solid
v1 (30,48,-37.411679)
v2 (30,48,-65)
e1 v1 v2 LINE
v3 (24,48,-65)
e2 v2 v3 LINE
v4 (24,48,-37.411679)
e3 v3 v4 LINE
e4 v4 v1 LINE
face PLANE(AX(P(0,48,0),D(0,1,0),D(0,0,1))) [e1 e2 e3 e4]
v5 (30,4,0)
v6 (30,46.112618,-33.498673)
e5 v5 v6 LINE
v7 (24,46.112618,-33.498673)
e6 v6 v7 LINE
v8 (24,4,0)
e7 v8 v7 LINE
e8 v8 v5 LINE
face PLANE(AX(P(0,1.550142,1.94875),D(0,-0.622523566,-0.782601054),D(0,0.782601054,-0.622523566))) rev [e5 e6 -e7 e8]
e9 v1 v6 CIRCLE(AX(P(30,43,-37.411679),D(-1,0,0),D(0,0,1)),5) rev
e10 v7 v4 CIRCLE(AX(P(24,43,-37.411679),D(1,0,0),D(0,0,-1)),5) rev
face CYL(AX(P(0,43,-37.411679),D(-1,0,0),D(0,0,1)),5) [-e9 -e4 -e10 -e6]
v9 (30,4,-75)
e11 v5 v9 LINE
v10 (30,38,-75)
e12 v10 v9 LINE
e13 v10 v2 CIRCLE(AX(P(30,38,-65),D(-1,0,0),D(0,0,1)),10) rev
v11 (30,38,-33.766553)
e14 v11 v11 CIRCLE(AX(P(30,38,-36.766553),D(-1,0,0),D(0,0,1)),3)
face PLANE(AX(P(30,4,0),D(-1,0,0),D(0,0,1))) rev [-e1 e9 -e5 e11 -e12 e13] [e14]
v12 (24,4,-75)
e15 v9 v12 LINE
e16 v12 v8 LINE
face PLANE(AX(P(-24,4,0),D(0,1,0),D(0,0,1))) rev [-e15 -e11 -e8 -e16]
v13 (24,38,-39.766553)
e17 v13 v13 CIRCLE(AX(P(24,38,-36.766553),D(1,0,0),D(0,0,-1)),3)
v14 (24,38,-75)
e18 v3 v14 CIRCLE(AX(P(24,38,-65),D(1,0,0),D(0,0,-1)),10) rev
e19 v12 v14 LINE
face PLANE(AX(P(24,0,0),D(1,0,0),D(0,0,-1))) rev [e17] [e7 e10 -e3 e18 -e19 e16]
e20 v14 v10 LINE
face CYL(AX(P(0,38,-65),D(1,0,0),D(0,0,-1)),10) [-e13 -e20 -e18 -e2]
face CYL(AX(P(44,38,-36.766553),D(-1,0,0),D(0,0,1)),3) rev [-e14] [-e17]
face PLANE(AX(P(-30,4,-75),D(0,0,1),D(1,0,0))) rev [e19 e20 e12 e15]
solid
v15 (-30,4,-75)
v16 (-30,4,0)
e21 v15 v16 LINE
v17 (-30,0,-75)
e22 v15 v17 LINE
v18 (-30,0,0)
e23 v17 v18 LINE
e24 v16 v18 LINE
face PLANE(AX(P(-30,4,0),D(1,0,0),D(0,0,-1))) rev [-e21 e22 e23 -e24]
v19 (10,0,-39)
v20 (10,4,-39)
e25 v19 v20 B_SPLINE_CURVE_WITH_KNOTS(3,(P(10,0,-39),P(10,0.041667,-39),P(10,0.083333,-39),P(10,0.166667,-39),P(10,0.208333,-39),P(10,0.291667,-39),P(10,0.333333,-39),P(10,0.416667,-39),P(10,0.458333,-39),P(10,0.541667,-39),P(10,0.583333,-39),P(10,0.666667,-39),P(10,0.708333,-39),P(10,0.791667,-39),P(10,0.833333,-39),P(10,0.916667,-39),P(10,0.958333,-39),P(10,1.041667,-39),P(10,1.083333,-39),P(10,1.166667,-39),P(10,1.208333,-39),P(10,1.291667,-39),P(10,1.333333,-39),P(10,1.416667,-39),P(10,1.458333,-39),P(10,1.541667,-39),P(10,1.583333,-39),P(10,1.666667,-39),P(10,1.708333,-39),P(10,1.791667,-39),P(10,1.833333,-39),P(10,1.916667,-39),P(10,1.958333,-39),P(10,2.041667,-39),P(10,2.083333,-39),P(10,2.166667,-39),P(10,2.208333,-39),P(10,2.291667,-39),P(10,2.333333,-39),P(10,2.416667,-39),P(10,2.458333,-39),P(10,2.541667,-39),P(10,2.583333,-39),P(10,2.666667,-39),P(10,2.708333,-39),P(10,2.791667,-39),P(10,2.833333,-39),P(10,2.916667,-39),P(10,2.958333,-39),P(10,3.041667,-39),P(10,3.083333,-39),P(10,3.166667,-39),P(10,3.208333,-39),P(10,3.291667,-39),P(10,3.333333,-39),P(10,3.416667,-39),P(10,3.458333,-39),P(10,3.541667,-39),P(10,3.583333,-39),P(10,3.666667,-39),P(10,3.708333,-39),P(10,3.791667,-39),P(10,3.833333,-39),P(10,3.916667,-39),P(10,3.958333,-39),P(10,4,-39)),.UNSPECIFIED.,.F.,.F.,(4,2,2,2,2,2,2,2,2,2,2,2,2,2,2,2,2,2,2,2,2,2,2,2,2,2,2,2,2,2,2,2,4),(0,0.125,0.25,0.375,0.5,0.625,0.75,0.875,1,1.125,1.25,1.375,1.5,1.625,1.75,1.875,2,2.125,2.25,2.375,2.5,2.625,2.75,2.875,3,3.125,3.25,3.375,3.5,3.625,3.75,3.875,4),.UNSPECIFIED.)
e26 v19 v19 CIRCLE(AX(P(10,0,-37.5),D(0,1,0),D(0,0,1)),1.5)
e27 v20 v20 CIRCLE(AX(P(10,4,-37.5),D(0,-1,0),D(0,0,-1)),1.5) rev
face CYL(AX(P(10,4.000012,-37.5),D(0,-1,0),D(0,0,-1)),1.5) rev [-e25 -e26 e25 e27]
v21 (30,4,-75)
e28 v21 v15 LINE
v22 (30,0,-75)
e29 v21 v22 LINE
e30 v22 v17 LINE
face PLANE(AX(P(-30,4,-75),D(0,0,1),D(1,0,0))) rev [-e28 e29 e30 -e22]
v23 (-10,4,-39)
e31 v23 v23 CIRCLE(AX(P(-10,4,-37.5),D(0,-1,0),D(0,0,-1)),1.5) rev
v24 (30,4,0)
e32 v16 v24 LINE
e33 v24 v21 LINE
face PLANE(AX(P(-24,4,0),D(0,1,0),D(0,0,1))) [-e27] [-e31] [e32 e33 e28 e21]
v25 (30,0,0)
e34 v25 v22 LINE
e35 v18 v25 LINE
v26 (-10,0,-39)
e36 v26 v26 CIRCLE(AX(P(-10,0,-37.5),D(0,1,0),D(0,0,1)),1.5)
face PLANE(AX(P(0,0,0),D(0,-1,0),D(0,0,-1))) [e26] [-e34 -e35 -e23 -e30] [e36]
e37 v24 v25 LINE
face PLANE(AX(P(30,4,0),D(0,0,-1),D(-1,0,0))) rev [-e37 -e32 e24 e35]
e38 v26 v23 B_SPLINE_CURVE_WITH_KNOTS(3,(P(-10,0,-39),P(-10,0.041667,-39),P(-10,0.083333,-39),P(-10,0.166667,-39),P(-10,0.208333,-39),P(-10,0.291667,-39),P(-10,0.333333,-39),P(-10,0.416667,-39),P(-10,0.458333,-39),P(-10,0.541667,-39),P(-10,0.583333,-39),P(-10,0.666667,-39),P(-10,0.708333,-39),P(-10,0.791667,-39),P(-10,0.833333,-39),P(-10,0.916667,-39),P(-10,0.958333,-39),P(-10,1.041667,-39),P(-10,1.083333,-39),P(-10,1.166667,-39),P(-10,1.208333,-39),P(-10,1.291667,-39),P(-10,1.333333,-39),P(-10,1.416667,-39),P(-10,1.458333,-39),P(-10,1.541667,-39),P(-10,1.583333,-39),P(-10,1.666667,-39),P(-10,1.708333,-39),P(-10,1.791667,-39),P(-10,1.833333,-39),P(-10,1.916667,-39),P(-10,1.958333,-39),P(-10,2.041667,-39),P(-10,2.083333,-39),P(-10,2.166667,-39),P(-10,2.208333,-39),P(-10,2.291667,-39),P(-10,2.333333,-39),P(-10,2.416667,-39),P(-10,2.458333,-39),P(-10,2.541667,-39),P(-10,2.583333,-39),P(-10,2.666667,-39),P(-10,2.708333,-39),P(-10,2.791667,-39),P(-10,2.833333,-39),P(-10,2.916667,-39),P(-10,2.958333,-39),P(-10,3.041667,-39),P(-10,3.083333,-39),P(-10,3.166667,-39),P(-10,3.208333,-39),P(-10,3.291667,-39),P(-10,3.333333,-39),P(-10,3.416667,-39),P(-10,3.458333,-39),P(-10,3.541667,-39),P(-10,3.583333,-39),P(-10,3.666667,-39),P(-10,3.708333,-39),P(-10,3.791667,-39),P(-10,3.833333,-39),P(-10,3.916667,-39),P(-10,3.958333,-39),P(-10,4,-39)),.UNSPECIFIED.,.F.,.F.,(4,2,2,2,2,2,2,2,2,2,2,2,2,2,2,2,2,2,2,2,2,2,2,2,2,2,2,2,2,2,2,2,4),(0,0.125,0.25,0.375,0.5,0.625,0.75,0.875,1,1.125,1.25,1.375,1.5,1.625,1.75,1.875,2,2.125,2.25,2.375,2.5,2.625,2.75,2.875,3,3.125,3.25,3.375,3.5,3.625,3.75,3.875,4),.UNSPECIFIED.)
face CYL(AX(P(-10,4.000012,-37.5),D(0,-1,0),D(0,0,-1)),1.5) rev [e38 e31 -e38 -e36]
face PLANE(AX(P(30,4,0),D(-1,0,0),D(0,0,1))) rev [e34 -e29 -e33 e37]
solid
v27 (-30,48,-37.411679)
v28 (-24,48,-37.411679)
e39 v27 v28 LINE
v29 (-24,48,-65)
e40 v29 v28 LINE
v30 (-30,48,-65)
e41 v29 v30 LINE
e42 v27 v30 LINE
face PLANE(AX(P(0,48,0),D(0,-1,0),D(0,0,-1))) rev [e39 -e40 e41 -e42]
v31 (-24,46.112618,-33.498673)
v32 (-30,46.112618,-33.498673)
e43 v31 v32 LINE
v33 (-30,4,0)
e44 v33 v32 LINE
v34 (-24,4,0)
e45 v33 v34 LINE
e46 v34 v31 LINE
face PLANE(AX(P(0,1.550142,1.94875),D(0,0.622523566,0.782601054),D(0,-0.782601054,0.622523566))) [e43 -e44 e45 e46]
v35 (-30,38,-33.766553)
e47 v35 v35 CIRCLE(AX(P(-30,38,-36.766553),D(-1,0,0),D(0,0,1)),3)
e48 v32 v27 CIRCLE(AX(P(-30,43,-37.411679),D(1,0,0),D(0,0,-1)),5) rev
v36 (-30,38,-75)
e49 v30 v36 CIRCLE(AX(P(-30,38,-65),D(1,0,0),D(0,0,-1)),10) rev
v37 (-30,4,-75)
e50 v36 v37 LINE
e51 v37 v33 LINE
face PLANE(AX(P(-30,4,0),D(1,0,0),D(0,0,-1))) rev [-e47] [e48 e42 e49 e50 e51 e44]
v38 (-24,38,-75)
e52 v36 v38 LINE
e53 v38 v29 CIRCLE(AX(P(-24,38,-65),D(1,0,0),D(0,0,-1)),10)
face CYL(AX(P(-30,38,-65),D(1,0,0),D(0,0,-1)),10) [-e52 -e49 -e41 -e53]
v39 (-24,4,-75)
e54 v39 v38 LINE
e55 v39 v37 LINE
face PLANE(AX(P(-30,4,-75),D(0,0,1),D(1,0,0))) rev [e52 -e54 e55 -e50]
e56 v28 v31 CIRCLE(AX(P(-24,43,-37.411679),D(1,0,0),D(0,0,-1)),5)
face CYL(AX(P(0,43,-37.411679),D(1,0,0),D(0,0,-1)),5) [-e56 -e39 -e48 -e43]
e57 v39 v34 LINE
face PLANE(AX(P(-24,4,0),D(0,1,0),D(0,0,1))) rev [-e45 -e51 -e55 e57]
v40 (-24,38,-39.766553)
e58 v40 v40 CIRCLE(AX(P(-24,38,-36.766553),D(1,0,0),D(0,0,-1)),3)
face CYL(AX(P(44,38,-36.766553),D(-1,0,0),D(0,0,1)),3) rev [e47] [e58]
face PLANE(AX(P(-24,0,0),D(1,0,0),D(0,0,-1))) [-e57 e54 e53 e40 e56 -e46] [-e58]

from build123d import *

# Parameters (mm, degrees)
SKETCH1_W               = 60
SKETCH1_H               = 75
BOSS_EXTRUDE1_DEPTH     = 4
CUT_EXTRUDE1_DEPTH      = 81.876448982
CUT_EXTRUDE1_DEPTH_BACK = 4
SKETCH2_R               = 1.5
SKETCH8_R               = 3
CUT_EXTRUDE2_DEPTH      = 74
FILLET3_R               = 5
FILLET4_R               = 10
SPLIT1_START            = 4
SPLIT1_OUTLINE_W        = 6
SPLIT1_OUTLINE_H        = 76
SPLIT1_DEPTH            = 44
SPLIT1_START_2          = -30
SPLIT1_2_OUTLINE_R      = 3
SPLIT1_2_DEPTH          = 6
SPLIT1_START_3          = 24
SPLIT1_3_OUTLINE_R      = 3
SPLIT1_3_DEPTH          = 6


# Read off the part's stored shape, not the designer's step: Split1
with BuildPart() as part:
    # Sketch1 → Boss-Extrude1 (new body)
    with BuildSketch(Plane(origin=(0, 0, 0), x_dir=(1, 0, 0), z_dir=(0, 1, 0))):
        with Locations((0, 37.5)):
            Rectangle(SKETCH1_W, SKETCH1_H)
    extrude(amount=BOSS_EXTRUDE1_DEPTH)

    # Sketch2 → Cut-Extrude1 (cut, two sides: drawn at the far end of the back side and taken through both)
    with BuildSketch(Plane(origin=(0, 4, 0), x_dir=(1, 0, 0), z_dir=(0, 1, 0)).offset(-CUT_EXTRUDE1_DEPTH_BACK)):
        with Locations(Location((-10, 37.5, 0), (0, 0, 90))):
            Circle(SKETCH2_R)
        with Locations(Location((10, 37.5, 0), (0, 0, 90))):
            Circle(SKETCH2_R)
    extrude(amount=CUT_EXTRUDE1_DEPTH + CUT_EXTRUDE1_DEPTH_BACK, mode=Mode.SUBTRACT)

    # Sketch3 → Loft1 section 0
    with BuildSketch(Plane(origin=(0, 4, 0), x_dir=(1, 0, 0), z_dir=(0, 1, 0))):
        with BuildLine():
            Line((30, 75), (24, 75))
            Line((24, 75), (24, 0))
            Line((24, 0), (30, 0))
            Line((30, 0), (30, 75))
        make_face()
    # Sketch4 → Loft1 section 1
    with BuildSketch(Plane(origin=(0, 48, 0), x_dir=(1, 0, 0), z_dir=(0, 1, 0))):
        with BuildLine():
            Line((24, 75), (24, 35))
            Line((24, 35), (30, 35))
            Line((30, 35), (30, 75))
            Line((30, 75), (24, 75))
        make_face()
    loft()

    # Sketch3<19> → Loft2 section 0
    with BuildSketch(Plane(origin=(0, 4, 0), x_dir=(1, 0, 0), z_dir=(0, 1, 0))):
        with BuildLine():
            Line((-30, 75), (-24, 75))
            Line((-24, 75), (-24, 0))
            Line((-24, 0), (-30, 0))
            Line((-30, 0), (-30, 75))
        make_face()
    # Sketch4<17> → Loft2 section 1
    with BuildSketch(Plane(origin=(0, 48, 0), x_dir=(1, 0, 0), z_dir=(0, 1, 0))):
        with BuildLine():
            Line((-24, 75), (-24, 35))
            Line((-24, 35), (-30, 35))
            Line((-30, 35), (-30, 75))
            Line((-30, 75), (-24, 75))
        make_face()
    loft()

    # Sketch8 → Cut-Extrude2 (cut)
    with BuildSketch(Plane.ZY.offset(30)):
        with Locations((-36.766552642, 38)):
            Circle(SKETCH8_R)
    extrude(amount=-CUT_EXTRUDE2_DEPTH, mode=Mode.SUBTRACT)

    # Fillet3
    fillet3_edges = [part.edges().sort_by_distance(p)[0] for p in [
        (27, 48, -35),
        (-27, 48, -35),
    ]]
    fillet(fillet3_edges, radius=FILLET3_R)

    # Fillet4
    fillet4_edges = [part.edges().sort_by_distance(p)[0] for p in [
        (-27, 48, -75),
        (27, 48, -75),
    ]]
    fillet(fillet4_edges, radius=FILLET4_R)

    # Split1 outline → Split1 (cut)
    with BuildSketch(Plane(origin=(0, 0, 0), x_dir=(1, 0, 0), z_dir=(0, 1, 0)).offset(SPLIT1_START)):
        with Locations((-27, 37)):
            Rectangle(SPLIT1_OUTLINE_W, SPLIT1_OUTLINE_H)
        with Locations((27, 37)):
            Rectangle(SPLIT1_OUTLINE_W, SPLIT1_OUTLINE_H)
    extrude(amount=SPLIT1_DEPTH, mode=Mode.SUBTRACT)


with BuildPart() as body_2:
    # Split1 2 outline → Split1 2 (new body)
    with BuildSketch(Plane.YZ.offset(SPLIT1_START_2)):
        with BuildLine():
            Line((4, 0), (4, -75))
            Line((4, -75), (38, -75))
            ThreePointArc((38, -75), (45.071067812, -72.071067812), (48, -65))
            Line((48, -65), (48, -37.411678544))
            ThreePointArc((48, -37.411678544), (47.503503589, -35.239477948), (46.112617829, -33.498673273))
            Line((46.112617829, -33.498673273), (4, 0))
        make_face()
        with Locations((38, -36.766552642)):
            Circle(SPLIT1_2_OUTLINE_R, mode=Mode.SUBTRACT)
    extrude(amount=SPLIT1_2_DEPTH)


with BuildPart() as body_3:
    # Split1 3 outline → Split1 3 (new body)
    with BuildSketch(Plane.YZ.offset(SPLIT1_START_3)):
        with BuildLine():
            Line((4, 0), (4, -75))
            Line((4, -75), (38, -75))
            ThreePointArc((38, -75), (45.071067812, -72.071067812), (48, -65))
            Line((48, -65), (48, -37.411678544))
            ThreePointArc((48, -37.411678544), (47.503503589, -35.239477948), (46.112617829, -33.498673273))
            Line((46.112617829, -33.498673273), (4, 0))
        make_face()
        with Locations((38, -36.766552642)):
            Circle(SPLIT1_3_OUTLINE_R, mode=Mode.SUBTRACT)
    extrude(amount=SPLIT1_3_DEPTH)


solid = Compound([part.part, body_2.part, body_3.part])
